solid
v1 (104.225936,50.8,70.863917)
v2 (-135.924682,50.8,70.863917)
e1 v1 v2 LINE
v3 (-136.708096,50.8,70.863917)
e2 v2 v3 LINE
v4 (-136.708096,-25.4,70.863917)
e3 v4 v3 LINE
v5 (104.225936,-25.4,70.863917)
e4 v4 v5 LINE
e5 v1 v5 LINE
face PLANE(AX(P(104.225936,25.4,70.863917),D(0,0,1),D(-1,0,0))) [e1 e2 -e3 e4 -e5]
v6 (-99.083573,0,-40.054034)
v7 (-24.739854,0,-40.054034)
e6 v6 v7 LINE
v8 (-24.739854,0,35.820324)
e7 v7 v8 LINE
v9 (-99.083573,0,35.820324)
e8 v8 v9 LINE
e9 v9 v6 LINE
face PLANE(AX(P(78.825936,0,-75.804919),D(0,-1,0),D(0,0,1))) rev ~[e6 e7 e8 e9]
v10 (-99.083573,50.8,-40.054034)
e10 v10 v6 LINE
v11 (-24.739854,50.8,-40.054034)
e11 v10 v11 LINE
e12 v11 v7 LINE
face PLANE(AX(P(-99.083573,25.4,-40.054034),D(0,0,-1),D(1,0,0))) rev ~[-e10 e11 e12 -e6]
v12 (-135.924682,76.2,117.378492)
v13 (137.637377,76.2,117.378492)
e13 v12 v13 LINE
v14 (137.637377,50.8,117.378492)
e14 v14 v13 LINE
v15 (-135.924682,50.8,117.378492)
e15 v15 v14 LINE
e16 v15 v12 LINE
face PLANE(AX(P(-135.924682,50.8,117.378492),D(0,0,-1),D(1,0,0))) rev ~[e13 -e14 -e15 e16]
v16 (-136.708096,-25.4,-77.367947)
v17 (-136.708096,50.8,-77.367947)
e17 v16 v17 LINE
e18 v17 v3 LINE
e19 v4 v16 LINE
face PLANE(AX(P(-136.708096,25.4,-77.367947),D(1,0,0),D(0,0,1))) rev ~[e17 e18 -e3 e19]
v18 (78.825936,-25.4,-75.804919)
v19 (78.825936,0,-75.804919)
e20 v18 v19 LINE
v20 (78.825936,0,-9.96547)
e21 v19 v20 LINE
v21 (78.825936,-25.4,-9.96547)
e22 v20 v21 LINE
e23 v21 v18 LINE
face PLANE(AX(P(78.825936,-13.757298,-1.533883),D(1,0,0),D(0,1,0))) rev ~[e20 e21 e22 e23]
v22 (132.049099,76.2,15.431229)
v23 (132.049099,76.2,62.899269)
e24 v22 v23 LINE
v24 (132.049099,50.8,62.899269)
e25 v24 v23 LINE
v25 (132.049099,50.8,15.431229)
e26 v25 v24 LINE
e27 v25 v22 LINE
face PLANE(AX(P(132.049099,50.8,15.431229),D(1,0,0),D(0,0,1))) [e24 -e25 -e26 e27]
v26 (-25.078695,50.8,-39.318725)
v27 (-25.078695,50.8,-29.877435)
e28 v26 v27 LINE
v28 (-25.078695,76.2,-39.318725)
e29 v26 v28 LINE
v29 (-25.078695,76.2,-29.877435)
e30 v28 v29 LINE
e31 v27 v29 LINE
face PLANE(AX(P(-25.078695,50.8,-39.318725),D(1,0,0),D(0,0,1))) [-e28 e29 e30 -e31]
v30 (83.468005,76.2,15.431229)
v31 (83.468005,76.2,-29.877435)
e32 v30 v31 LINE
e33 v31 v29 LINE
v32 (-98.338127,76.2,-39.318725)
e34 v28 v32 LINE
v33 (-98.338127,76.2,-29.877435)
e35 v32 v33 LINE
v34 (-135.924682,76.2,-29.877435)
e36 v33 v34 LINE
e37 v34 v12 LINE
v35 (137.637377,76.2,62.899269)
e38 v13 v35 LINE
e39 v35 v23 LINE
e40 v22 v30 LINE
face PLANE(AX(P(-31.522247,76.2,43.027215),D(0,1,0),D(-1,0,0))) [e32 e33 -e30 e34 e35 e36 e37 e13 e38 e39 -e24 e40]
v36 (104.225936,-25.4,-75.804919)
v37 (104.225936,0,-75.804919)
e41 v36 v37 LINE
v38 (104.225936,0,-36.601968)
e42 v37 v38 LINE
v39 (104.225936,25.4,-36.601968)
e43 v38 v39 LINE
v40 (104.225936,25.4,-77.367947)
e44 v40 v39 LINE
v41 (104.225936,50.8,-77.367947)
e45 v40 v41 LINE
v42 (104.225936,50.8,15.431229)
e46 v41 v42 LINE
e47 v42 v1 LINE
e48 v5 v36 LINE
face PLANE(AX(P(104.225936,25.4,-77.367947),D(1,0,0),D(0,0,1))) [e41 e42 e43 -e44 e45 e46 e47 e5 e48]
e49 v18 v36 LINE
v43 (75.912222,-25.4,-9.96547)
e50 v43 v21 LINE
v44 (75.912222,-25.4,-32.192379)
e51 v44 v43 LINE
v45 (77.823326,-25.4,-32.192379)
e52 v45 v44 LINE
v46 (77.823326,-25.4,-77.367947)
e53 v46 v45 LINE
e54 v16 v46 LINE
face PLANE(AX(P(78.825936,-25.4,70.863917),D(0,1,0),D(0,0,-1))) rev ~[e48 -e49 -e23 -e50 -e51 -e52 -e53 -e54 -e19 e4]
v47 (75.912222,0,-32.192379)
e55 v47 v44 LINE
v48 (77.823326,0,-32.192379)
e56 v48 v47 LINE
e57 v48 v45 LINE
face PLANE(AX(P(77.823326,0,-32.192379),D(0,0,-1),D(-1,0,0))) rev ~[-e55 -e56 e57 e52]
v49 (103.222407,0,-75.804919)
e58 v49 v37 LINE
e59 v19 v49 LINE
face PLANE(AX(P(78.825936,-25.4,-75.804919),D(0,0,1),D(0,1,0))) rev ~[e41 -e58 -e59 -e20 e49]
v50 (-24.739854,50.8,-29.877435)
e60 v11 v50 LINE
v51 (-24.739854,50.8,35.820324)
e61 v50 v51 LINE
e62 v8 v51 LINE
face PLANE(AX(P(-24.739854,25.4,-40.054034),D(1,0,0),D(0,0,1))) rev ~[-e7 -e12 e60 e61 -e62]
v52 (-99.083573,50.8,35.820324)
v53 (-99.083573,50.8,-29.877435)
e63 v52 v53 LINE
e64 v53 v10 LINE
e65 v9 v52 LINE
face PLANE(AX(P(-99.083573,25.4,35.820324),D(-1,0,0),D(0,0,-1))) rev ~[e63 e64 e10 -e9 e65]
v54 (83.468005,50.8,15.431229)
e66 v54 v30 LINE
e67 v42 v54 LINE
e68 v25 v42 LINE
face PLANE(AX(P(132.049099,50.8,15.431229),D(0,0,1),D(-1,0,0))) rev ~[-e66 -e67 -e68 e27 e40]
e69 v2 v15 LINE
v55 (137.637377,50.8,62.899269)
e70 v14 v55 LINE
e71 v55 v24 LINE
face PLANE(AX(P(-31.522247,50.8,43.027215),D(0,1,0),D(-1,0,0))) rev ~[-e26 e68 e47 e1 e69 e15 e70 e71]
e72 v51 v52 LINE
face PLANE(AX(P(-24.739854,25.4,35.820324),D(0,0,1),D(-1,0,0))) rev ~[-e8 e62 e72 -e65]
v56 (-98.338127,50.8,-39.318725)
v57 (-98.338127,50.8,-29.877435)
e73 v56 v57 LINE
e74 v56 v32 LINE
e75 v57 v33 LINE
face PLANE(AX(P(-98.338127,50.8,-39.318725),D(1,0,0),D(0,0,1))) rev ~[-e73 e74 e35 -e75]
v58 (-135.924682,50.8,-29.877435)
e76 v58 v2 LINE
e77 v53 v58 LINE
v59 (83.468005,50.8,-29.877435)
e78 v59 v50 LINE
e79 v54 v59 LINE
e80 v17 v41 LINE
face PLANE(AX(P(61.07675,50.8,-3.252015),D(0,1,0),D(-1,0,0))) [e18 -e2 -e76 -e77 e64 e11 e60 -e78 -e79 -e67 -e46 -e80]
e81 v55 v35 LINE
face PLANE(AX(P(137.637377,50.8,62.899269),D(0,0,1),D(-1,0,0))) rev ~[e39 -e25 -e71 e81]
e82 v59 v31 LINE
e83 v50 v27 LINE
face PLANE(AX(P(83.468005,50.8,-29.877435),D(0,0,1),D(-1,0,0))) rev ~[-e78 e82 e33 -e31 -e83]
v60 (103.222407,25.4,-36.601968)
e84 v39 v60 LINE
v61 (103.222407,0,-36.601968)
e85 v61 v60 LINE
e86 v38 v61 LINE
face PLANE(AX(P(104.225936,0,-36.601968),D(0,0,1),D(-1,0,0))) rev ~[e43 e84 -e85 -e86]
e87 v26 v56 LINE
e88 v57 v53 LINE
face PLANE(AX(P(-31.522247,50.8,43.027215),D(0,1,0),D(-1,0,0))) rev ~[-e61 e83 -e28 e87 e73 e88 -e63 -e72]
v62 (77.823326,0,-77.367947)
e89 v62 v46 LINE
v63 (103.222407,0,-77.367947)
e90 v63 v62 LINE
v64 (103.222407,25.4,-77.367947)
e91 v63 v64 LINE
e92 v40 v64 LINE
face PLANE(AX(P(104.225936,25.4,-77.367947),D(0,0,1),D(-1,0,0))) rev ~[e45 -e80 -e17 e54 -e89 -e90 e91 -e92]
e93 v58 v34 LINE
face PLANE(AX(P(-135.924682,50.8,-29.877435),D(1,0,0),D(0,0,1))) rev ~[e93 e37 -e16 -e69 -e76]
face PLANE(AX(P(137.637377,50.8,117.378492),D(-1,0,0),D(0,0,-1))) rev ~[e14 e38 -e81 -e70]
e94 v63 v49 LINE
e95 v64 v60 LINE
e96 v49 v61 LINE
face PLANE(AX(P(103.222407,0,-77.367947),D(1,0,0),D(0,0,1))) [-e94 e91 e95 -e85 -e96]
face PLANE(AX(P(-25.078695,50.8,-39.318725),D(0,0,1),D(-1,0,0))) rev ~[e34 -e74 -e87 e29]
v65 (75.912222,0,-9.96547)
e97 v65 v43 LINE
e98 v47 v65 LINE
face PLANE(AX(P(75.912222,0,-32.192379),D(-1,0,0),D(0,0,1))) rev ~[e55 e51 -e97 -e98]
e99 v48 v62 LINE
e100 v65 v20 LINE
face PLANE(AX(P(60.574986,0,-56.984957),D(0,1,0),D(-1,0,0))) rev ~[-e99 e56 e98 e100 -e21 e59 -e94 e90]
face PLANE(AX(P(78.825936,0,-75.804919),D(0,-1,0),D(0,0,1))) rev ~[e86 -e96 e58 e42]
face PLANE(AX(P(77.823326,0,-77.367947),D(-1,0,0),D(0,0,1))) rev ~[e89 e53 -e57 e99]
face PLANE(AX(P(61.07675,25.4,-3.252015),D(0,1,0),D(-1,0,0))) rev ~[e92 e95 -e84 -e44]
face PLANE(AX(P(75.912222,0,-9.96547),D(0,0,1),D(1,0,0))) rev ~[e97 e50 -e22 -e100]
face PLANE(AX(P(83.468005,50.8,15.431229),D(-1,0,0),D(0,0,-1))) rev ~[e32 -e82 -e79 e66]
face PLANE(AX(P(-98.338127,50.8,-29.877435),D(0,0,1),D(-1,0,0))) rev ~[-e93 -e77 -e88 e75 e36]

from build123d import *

# Parameters (mm, degrees)
F0_W      = 212.6203179359
F0_H      = 22.2269091755
F1_DEPTH  = 25.4
F2_W      = 13.6859714985
F2_H      = 40.4146937653
F3_DEPTH  = 25.4
F5_DEPTH  = 25.4
F7_DEPTH  = 25.4
F8_W      = 86.2983710408
F8_H      = 107.4658855796
F9_DEPTH  = 25.4
F10_W     = 85.29484272
F10_H     = 40.7659783959
F11_DEPTH = 25.4
F12_W     = 86.2983710408
F12_H     = 148.2318639755
F13_DEPTH = 25.4
F15_W     = 73.2594318688
F15_H     = 64.30112198
F15_H_2   = 9.4412900507
F15_W_2   = 48.5810935497
F15_H_3   = 47.4680401385
F15_W_3   = 54.1693717241
F15_H_4   = 43.5468889773
F16_DEPTH = 25.4


with BuildPart() as f1:
    # F0 (on Front) → F1 (new body)
    with BuildSketch(Plane.XZ):
        Polygon((-136.7080956697, 70.86391747), (-136.7080956697, -9.9654700607), (75.9122222662, -9.9654700607), (78.8259357214, -9.9654700607), (78.8259357214, 70.86391747), align=None)
        with Locations((-30.3979367018, -21.0789246485)):
            Rectangle(F0_W, F0_H)
        Polygon((75.9122222662, -32.1923792362), (-136.7080956697, -32.1923792362), (-136.7080956697, -77.3679465055), (77.8233259916, -77.3679465055), (77.8233259916, -32.1923792362), align=None)
    extrude(amount=F1_DEPTH)

    # F2 (on face) → F3 (join)
    with BuildSketch(Plane.YZ.offset(78.8259357214)):
        Polygon((0, 30.4492237046), (0, 70.86391747), (-25.4, 70.86391747), (-25.4, -75.8049190044), (0, -75.8049190044), (0, -9.9654700607), (-13.6859714985, -9.9654700607), (-13.6859714985, 30.4492237046), align=None)
        with Locations((-6.8429857492, 10.241876822)):
            Rectangle(F2_W, F2_H)
    extrude(amount=F3_DEPTH)

    # F4 (on face) → F5 (join)
    with BuildSketch(Plane(origin=(0, 0, 0), x_dir=(-1, 0, 0), z_dir=(0, 1, 0))):
        Polygon((75.8066177368, -40.0540344417), (75.8066177368, -77.3679465055), (136.7080956697, -77.3679465055), (136.7080956697, 70.86391747), (75.8066177368, 70.86391747), (75.8066177368, 35.8203239739), (99.0835726261, 35.8203239739), (99.0835726261, -40.0540344417), align=None)
        Polygon((-17.9275646806, -77.3679465055), (75.8066177368, -77.3679465055), (75.8066177368, -40.0540344417), (24.7398540378, -40.0540344417), (24.7398540378, 35.8203239739), (75.8066177368, 35.8203239739), (75.8066177368, 70.86391747), (-17.9275646806, 70.86391747), align=None)
    extrude(amount=F5_DEPTH)

    # F6 (on face) → F7 (join)
    with BuildSketch(Plane(origin=(0, 25.4, 0), x_dir=(-1, 0, 0), z_dir=(0, 1, 0))):
        Polygon((24.7398540378, -40.0540344417), (24.7398540378, 14.7684887052), (-17.9275646806, 14.7684887052), (-17.9275646806, -77.3679465055), (77.9451653361, -77.3679465055), (77.9451653361, -40.0540344417), align=None)
        Polygon((-17.9275646806, 14.7684887052), (24.7398540378, 14.7684887052), (24.7398540378, 35.8203239739), (77.9451653361, 35.8203239739), (77.9451653361, 70.86391747), (-17.9275646806, 70.86391747), align=None)
        Polygon((77.9451653361, 70.86391747), (77.9451653361, 35.8203239739), (99.0835726261, 35.8203239739), (99.0835726261, -40.0540344417), (77.9451653361, -40.0540344417), (77.9451653361, -77.3679465055), (136.7080956697, -77.3679465055), (136.7080956697, 70.86391747), align=None)
    extrude(amount=F7_DEPTH)

    # F8 (on face) → F9 (join)
    with BuildSketch(Plane(origin=(0, 0, 0), x_dir=(-1, 0, 0), z_dir=(0, 1, 0))):
        with Locations((-61.076750201, 17.1309746802)):
            Rectangle(F8_W, F8_H)
    extrude(amount=F9_DEPTH)

    # F10 (on face) → F11 (join)
    with BuildSketch(Plane(origin=(0, 0, 0), x_dir=(-1, 0, 0), z_dir=(0, 1, 0))):
        with Locations((-60.5749860406, -56.9849573076)):
            Rectangle(F10_W, F10_H)
    extrude(amount=F11_DEPTH)

    # F12 (on face) → F13 (join)
    with BuildSketch(Plane(origin=(0, 25.4, 0), x_dir=(-1, 0, 0), z_dir=(0, 1, 0))):
        with Locations((-61.076750201, -3.2520145178)):
            Rectangle(F12_W, F12_H)
    extrude(amount=F13_DEPTH)

    # F15 (on face) → F16 (join)
    with BuildSketch(Plane(origin=(0, 50.8, 0), x_dir=(-1, 0, 0), z_dir=(0, 1, 0))):
        Polygon((25.0786952674, -29.877435416), (25.0786952674, 34.423686564), (98.3381271362, 34.423686564), (98.3381271362, -29.877435416), (135.9246820211, -29.877435416), (135.9246820211, 117.3784919083), (-83.4680050611, 117.3784919083), (-83.4680050611, 73.831602931), (-83.4680050611, 62.8992691636), (-83.4680050611, 15.4312290251), (-83.4680050611, -29.877435416), align=None)
        with Locations((61.7084112018, 2.273125574)):
            Rectangle(F15_W, F15_H)
        with Locations((61.7084112018, -34.5980804414)):
            Rectangle(F15_W, F15_H_2)
        with Locations((-107.758551836, 39.1652490944)):
            Rectangle(F15_W_2, F15_H_3)
        Polygon((-132.0490986109, 62.8992691636), (-83.4680050611, 62.8992691636), (-83.4680050611, 73.831602931), (-137.6373767853, 73.831602931), (-137.6373767853, 62.8992691636), align=None)
        with Locations((-110.5526909232, 95.6050474197)):
            Rectangle(F15_W_3, F15_H_4)
    extrude(amount=F16_DEPTH)


solid = f1.part
